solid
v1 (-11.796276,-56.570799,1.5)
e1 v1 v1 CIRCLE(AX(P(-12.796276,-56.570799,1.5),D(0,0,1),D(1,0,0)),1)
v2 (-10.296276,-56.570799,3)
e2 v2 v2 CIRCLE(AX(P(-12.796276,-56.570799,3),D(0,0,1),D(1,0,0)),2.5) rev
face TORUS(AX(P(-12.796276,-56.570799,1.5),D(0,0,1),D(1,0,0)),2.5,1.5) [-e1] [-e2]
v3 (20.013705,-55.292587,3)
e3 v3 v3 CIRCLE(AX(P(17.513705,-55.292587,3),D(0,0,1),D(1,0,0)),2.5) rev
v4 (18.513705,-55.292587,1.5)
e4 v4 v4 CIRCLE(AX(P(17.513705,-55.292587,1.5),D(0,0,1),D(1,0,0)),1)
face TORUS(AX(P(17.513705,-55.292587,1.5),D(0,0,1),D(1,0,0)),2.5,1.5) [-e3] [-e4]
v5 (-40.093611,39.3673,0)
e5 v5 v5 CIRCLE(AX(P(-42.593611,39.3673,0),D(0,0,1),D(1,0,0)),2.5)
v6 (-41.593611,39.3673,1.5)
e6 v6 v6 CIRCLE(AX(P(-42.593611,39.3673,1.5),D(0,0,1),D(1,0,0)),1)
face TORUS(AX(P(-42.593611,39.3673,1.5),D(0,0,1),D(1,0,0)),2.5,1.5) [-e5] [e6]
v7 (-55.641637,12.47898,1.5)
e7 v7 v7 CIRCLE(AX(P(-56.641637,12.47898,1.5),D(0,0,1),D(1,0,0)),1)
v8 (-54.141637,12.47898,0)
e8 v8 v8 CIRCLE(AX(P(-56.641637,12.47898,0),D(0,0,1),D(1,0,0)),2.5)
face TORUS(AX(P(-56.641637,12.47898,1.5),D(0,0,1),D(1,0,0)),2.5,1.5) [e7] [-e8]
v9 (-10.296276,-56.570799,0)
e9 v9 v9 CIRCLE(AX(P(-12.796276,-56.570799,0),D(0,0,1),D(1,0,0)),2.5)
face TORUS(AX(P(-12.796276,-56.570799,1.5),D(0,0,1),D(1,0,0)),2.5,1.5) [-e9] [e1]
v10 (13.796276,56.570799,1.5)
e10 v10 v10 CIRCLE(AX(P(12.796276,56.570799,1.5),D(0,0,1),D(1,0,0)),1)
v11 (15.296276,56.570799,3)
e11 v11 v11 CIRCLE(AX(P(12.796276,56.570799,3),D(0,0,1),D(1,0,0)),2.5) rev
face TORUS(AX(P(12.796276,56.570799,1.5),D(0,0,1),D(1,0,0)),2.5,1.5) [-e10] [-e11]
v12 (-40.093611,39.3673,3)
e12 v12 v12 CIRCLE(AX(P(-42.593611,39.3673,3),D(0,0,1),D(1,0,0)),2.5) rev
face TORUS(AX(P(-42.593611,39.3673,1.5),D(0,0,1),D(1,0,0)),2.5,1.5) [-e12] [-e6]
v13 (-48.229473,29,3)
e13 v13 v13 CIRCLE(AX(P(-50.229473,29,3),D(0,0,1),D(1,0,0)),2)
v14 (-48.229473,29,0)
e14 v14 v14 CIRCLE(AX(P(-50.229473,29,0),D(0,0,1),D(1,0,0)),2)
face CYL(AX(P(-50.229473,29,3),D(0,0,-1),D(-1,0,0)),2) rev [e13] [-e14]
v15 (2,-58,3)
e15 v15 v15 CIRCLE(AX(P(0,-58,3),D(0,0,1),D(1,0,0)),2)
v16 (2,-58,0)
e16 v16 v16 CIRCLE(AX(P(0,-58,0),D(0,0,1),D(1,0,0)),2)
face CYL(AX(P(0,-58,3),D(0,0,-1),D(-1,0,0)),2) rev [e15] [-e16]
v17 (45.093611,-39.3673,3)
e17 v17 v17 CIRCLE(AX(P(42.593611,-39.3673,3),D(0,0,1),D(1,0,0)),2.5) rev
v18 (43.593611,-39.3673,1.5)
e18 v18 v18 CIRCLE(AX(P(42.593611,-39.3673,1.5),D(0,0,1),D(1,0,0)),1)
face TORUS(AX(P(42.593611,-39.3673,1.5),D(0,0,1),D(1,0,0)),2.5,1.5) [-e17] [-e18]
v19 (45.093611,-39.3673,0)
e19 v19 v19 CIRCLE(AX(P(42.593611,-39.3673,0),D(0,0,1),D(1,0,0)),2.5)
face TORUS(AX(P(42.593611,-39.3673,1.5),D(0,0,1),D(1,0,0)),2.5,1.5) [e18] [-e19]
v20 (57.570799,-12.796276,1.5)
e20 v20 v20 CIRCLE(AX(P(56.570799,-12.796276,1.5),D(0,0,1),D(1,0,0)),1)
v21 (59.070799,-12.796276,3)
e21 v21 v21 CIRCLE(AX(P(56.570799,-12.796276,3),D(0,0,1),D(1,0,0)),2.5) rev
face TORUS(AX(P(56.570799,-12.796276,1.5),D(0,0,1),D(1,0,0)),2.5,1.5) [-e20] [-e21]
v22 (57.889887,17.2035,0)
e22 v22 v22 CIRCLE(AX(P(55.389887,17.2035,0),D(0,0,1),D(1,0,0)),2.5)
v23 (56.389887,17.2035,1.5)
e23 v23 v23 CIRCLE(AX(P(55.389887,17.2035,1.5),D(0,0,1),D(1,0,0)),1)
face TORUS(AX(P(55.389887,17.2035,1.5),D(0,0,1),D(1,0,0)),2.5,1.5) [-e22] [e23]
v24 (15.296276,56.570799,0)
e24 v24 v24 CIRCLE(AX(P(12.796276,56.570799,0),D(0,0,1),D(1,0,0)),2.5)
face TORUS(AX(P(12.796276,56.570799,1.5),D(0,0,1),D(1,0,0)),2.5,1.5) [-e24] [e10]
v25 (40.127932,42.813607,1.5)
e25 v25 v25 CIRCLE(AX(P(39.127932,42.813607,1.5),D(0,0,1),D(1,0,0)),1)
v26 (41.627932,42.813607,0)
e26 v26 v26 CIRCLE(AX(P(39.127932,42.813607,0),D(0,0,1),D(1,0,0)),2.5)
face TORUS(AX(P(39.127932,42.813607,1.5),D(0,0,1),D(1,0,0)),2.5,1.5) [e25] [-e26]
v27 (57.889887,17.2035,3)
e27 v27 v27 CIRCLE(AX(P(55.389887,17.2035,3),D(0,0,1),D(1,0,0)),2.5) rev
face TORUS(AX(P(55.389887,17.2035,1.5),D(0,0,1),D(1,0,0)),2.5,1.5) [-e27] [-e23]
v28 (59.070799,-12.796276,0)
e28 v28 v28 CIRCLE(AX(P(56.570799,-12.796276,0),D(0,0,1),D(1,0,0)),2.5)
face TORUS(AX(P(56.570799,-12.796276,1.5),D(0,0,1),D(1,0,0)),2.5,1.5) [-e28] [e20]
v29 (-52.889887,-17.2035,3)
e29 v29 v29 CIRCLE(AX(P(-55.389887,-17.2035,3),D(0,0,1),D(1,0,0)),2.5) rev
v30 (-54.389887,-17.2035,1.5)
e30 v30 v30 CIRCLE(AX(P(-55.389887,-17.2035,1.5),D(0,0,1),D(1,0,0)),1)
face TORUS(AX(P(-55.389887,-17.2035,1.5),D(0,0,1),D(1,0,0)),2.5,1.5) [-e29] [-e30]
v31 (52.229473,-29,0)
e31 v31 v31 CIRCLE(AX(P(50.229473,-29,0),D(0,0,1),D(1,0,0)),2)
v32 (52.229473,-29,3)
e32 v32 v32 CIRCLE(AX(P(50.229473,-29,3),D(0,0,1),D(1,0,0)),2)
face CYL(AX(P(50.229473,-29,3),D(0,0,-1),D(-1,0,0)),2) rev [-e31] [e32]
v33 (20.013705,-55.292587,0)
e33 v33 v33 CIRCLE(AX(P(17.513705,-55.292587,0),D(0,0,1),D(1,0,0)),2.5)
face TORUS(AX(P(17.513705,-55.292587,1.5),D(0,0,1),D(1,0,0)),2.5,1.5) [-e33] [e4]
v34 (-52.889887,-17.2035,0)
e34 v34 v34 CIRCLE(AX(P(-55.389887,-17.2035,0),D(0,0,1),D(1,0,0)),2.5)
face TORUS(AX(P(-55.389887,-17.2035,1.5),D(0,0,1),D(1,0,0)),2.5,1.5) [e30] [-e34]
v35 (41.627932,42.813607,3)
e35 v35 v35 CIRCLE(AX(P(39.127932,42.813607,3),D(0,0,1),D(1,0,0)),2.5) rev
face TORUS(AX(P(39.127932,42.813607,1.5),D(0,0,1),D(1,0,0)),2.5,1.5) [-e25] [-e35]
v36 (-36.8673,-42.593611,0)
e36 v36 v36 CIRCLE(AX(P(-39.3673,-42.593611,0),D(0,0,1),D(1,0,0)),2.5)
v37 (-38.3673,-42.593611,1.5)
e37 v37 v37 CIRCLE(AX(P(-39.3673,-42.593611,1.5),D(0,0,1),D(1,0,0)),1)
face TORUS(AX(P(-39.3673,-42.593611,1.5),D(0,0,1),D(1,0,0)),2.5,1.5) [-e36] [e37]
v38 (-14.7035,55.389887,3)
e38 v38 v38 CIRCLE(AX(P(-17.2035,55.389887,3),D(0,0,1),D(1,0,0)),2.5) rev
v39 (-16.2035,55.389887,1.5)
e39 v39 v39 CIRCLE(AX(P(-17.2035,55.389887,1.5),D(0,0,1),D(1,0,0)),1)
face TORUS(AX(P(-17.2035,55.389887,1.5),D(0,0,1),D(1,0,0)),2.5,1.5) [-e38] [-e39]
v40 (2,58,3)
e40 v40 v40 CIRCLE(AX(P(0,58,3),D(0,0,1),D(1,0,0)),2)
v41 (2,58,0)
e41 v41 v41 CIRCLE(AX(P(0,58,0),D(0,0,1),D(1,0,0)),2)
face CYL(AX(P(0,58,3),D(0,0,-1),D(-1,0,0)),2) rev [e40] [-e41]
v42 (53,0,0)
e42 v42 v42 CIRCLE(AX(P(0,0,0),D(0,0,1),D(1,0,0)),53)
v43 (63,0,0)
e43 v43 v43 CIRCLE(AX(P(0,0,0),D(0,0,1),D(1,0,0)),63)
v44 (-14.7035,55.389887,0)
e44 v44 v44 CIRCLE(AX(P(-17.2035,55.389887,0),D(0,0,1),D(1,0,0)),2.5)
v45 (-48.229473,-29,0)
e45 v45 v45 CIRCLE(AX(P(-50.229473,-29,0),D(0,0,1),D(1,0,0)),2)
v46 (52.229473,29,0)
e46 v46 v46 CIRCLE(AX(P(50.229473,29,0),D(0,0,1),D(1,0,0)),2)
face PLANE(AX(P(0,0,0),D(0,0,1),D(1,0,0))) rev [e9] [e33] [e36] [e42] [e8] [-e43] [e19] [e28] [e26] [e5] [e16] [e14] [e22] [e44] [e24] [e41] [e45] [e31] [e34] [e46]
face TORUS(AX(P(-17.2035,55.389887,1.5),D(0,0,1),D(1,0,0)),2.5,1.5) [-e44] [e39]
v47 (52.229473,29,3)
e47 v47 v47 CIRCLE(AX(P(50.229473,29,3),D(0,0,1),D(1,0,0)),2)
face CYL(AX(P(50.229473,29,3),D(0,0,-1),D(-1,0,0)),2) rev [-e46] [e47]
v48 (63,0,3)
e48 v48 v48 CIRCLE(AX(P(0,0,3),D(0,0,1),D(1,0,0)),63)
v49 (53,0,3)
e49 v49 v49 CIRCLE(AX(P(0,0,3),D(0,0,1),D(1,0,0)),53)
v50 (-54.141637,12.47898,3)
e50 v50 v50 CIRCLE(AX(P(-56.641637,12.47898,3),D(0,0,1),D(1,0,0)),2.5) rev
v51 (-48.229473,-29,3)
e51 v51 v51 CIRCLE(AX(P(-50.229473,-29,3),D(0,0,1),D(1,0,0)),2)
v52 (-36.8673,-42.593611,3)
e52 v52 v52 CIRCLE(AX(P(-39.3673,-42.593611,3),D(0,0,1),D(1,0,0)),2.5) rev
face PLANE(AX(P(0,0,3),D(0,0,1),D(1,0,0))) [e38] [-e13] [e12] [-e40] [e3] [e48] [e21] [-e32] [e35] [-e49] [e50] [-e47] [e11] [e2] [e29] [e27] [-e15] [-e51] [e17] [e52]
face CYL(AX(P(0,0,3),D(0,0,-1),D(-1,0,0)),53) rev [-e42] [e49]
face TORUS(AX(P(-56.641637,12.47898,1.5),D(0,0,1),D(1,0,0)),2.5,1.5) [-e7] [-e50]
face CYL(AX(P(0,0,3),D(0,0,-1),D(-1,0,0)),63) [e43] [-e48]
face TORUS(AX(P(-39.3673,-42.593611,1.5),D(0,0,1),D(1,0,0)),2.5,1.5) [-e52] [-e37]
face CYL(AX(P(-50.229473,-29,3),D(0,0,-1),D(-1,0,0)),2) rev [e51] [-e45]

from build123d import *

# Parameters (mm, degrees)
SKETCH_1_R      = 63
SKETCH_1_R_2    = 2
SKETCH_1_R_3    = 53
SKETCH_1_R_4    = 1
EXTRUDE_1_DEPTH = 3
FILLET_1_R      = 1.5


with BuildPart() as part:
    # 草图1 → 凸台-拉伸1 (new body)
    with BuildSketch(Plane.XY):
        Circle(SKETCH_1_R)
        with Locations((0, 58)):
            Circle(SKETCH_1_R_2, mode=Mode.SUBTRACT)
        Circle(SKETCH_1_R_3, mode=Mode.SUBTRACT)
        with Locations((50.229473419, 29)):
            Circle(SKETCH_1_R_2, mode=Mode.SUBTRACT)
        with Locations((50.229473419, -29)):
            Circle(SKETCH_1_R_2, mode=Mode.SUBTRACT)
        with Locations((0, -58)):
            Circle(SKETCH_1_R_2, mode=Mode.SUBTRACT)
        with Locations((-50.229473419, -29)):
            Circle(SKETCH_1_R_2, mode=Mode.SUBTRACT)
        with Locations((-50.229473419, 29)):
            Circle(SKETCH_1_R_2, mode=Mode.SUBTRACT)
        with Locations((55.389887154, 17.203499674)):
            Circle(SKETCH_1_R_4, mode=Mode.SUBTRACT)
        with Locations((56.570799225, -12.796275826)):
            Circle(SKETCH_1_R_4, mode=Mode.SUBTRACT)
        with Locations((12.796275826, 56.570799225)):
            Circle(SKETCH_1_R_4, mode=Mode.SUBTRACT)
        with Locations((39.127932346, 42.813606603)):
            Circle(SKETCH_1_R_4, mode=Mode.SUBTRACT)
        with Locations((-39.367299552, -42.593611329)):
            Circle(SKETCH_1_R_4, mode=Mode.SUBTRACT)
        with Locations((-12.796275826, -56.570799225)):
            Circle(SKETCH_1_R_4, mode=Mode.SUBTRACT)
        with Locations((17.513704773, -55.29258671)):
            Circle(SKETCH_1_R_4, mode=Mode.SUBTRACT)
        with Locations((42.593611328, -39.367299552)):
            Circle(SKETCH_1_R_4, mode=Mode.SUBTRACT)
        with Locations((-17.203499674, 55.389887154)):
            Circle(SKETCH_1_R_4, mode=Mode.SUBTRACT)
        with Locations((-42.593611329, 39.367299552)):
            Circle(SKETCH_1_R_4, mode=Mode.SUBTRACT)
        with Locations((-56.641637119, 12.478980108)):
            Circle(SKETCH_1_R_4, mode=Mode.SUBTRACT)
        with Locations((-55.389887154, -17.203499674)):
            Circle(SKETCH_1_R_4, mode=Mode.SUBTRACT)
    extrude(amount=EXTRUDE_1_DEPTH)

    # 圆角1
    fillet_1_edges = [part.edges().sort_by_distance(p)[0] for p in [
        (54.389887154, 17.203499674, 0),
        (54.389887154, 17.203499674, 3),
        (55.570799225, -12.796275826, 0),
        (55.570799225, -12.796275826, 3),
        (-13.796275826, -56.570799225, 0),
        (-13.796275826, -56.570799225, 3),
        (-40.367299552, -42.593611329, 0),
        (-40.367299552, -42.593611329, 3),
        (11.796275826, 56.570799225, 0),
        (11.796275826, 56.570799225, 3),
        (38.127932346, 42.813606603, 0),
        (38.127932346, 42.813606603, 3),
        (41.593611328, -39.367299552, 0),
        (41.593611328, -39.367299552, 3),
        (16.513704773, -55.29258671, 0),
        (16.513704773, -55.29258671, 3),
        (-43.593611329, 39.367299552, 0),
        (-43.593611329, 39.367299552, 3),
        (-18.203499674, 55.389887154, 0),
        (-18.203499674, 55.389887154, 3),
        (-56.389887154, -17.203499674, 0),
        (-56.389887154, -17.203499674, 3),
        (-57.641637119, 12.478980108, 0),
        (-57.641637119, 12.478980108, 3),
    ]]
    fillet(fillet_1_edges, radius=FILLET_1_R - 0.0001)  # a hair under: the kernel refuses the full size


solid = part.part
